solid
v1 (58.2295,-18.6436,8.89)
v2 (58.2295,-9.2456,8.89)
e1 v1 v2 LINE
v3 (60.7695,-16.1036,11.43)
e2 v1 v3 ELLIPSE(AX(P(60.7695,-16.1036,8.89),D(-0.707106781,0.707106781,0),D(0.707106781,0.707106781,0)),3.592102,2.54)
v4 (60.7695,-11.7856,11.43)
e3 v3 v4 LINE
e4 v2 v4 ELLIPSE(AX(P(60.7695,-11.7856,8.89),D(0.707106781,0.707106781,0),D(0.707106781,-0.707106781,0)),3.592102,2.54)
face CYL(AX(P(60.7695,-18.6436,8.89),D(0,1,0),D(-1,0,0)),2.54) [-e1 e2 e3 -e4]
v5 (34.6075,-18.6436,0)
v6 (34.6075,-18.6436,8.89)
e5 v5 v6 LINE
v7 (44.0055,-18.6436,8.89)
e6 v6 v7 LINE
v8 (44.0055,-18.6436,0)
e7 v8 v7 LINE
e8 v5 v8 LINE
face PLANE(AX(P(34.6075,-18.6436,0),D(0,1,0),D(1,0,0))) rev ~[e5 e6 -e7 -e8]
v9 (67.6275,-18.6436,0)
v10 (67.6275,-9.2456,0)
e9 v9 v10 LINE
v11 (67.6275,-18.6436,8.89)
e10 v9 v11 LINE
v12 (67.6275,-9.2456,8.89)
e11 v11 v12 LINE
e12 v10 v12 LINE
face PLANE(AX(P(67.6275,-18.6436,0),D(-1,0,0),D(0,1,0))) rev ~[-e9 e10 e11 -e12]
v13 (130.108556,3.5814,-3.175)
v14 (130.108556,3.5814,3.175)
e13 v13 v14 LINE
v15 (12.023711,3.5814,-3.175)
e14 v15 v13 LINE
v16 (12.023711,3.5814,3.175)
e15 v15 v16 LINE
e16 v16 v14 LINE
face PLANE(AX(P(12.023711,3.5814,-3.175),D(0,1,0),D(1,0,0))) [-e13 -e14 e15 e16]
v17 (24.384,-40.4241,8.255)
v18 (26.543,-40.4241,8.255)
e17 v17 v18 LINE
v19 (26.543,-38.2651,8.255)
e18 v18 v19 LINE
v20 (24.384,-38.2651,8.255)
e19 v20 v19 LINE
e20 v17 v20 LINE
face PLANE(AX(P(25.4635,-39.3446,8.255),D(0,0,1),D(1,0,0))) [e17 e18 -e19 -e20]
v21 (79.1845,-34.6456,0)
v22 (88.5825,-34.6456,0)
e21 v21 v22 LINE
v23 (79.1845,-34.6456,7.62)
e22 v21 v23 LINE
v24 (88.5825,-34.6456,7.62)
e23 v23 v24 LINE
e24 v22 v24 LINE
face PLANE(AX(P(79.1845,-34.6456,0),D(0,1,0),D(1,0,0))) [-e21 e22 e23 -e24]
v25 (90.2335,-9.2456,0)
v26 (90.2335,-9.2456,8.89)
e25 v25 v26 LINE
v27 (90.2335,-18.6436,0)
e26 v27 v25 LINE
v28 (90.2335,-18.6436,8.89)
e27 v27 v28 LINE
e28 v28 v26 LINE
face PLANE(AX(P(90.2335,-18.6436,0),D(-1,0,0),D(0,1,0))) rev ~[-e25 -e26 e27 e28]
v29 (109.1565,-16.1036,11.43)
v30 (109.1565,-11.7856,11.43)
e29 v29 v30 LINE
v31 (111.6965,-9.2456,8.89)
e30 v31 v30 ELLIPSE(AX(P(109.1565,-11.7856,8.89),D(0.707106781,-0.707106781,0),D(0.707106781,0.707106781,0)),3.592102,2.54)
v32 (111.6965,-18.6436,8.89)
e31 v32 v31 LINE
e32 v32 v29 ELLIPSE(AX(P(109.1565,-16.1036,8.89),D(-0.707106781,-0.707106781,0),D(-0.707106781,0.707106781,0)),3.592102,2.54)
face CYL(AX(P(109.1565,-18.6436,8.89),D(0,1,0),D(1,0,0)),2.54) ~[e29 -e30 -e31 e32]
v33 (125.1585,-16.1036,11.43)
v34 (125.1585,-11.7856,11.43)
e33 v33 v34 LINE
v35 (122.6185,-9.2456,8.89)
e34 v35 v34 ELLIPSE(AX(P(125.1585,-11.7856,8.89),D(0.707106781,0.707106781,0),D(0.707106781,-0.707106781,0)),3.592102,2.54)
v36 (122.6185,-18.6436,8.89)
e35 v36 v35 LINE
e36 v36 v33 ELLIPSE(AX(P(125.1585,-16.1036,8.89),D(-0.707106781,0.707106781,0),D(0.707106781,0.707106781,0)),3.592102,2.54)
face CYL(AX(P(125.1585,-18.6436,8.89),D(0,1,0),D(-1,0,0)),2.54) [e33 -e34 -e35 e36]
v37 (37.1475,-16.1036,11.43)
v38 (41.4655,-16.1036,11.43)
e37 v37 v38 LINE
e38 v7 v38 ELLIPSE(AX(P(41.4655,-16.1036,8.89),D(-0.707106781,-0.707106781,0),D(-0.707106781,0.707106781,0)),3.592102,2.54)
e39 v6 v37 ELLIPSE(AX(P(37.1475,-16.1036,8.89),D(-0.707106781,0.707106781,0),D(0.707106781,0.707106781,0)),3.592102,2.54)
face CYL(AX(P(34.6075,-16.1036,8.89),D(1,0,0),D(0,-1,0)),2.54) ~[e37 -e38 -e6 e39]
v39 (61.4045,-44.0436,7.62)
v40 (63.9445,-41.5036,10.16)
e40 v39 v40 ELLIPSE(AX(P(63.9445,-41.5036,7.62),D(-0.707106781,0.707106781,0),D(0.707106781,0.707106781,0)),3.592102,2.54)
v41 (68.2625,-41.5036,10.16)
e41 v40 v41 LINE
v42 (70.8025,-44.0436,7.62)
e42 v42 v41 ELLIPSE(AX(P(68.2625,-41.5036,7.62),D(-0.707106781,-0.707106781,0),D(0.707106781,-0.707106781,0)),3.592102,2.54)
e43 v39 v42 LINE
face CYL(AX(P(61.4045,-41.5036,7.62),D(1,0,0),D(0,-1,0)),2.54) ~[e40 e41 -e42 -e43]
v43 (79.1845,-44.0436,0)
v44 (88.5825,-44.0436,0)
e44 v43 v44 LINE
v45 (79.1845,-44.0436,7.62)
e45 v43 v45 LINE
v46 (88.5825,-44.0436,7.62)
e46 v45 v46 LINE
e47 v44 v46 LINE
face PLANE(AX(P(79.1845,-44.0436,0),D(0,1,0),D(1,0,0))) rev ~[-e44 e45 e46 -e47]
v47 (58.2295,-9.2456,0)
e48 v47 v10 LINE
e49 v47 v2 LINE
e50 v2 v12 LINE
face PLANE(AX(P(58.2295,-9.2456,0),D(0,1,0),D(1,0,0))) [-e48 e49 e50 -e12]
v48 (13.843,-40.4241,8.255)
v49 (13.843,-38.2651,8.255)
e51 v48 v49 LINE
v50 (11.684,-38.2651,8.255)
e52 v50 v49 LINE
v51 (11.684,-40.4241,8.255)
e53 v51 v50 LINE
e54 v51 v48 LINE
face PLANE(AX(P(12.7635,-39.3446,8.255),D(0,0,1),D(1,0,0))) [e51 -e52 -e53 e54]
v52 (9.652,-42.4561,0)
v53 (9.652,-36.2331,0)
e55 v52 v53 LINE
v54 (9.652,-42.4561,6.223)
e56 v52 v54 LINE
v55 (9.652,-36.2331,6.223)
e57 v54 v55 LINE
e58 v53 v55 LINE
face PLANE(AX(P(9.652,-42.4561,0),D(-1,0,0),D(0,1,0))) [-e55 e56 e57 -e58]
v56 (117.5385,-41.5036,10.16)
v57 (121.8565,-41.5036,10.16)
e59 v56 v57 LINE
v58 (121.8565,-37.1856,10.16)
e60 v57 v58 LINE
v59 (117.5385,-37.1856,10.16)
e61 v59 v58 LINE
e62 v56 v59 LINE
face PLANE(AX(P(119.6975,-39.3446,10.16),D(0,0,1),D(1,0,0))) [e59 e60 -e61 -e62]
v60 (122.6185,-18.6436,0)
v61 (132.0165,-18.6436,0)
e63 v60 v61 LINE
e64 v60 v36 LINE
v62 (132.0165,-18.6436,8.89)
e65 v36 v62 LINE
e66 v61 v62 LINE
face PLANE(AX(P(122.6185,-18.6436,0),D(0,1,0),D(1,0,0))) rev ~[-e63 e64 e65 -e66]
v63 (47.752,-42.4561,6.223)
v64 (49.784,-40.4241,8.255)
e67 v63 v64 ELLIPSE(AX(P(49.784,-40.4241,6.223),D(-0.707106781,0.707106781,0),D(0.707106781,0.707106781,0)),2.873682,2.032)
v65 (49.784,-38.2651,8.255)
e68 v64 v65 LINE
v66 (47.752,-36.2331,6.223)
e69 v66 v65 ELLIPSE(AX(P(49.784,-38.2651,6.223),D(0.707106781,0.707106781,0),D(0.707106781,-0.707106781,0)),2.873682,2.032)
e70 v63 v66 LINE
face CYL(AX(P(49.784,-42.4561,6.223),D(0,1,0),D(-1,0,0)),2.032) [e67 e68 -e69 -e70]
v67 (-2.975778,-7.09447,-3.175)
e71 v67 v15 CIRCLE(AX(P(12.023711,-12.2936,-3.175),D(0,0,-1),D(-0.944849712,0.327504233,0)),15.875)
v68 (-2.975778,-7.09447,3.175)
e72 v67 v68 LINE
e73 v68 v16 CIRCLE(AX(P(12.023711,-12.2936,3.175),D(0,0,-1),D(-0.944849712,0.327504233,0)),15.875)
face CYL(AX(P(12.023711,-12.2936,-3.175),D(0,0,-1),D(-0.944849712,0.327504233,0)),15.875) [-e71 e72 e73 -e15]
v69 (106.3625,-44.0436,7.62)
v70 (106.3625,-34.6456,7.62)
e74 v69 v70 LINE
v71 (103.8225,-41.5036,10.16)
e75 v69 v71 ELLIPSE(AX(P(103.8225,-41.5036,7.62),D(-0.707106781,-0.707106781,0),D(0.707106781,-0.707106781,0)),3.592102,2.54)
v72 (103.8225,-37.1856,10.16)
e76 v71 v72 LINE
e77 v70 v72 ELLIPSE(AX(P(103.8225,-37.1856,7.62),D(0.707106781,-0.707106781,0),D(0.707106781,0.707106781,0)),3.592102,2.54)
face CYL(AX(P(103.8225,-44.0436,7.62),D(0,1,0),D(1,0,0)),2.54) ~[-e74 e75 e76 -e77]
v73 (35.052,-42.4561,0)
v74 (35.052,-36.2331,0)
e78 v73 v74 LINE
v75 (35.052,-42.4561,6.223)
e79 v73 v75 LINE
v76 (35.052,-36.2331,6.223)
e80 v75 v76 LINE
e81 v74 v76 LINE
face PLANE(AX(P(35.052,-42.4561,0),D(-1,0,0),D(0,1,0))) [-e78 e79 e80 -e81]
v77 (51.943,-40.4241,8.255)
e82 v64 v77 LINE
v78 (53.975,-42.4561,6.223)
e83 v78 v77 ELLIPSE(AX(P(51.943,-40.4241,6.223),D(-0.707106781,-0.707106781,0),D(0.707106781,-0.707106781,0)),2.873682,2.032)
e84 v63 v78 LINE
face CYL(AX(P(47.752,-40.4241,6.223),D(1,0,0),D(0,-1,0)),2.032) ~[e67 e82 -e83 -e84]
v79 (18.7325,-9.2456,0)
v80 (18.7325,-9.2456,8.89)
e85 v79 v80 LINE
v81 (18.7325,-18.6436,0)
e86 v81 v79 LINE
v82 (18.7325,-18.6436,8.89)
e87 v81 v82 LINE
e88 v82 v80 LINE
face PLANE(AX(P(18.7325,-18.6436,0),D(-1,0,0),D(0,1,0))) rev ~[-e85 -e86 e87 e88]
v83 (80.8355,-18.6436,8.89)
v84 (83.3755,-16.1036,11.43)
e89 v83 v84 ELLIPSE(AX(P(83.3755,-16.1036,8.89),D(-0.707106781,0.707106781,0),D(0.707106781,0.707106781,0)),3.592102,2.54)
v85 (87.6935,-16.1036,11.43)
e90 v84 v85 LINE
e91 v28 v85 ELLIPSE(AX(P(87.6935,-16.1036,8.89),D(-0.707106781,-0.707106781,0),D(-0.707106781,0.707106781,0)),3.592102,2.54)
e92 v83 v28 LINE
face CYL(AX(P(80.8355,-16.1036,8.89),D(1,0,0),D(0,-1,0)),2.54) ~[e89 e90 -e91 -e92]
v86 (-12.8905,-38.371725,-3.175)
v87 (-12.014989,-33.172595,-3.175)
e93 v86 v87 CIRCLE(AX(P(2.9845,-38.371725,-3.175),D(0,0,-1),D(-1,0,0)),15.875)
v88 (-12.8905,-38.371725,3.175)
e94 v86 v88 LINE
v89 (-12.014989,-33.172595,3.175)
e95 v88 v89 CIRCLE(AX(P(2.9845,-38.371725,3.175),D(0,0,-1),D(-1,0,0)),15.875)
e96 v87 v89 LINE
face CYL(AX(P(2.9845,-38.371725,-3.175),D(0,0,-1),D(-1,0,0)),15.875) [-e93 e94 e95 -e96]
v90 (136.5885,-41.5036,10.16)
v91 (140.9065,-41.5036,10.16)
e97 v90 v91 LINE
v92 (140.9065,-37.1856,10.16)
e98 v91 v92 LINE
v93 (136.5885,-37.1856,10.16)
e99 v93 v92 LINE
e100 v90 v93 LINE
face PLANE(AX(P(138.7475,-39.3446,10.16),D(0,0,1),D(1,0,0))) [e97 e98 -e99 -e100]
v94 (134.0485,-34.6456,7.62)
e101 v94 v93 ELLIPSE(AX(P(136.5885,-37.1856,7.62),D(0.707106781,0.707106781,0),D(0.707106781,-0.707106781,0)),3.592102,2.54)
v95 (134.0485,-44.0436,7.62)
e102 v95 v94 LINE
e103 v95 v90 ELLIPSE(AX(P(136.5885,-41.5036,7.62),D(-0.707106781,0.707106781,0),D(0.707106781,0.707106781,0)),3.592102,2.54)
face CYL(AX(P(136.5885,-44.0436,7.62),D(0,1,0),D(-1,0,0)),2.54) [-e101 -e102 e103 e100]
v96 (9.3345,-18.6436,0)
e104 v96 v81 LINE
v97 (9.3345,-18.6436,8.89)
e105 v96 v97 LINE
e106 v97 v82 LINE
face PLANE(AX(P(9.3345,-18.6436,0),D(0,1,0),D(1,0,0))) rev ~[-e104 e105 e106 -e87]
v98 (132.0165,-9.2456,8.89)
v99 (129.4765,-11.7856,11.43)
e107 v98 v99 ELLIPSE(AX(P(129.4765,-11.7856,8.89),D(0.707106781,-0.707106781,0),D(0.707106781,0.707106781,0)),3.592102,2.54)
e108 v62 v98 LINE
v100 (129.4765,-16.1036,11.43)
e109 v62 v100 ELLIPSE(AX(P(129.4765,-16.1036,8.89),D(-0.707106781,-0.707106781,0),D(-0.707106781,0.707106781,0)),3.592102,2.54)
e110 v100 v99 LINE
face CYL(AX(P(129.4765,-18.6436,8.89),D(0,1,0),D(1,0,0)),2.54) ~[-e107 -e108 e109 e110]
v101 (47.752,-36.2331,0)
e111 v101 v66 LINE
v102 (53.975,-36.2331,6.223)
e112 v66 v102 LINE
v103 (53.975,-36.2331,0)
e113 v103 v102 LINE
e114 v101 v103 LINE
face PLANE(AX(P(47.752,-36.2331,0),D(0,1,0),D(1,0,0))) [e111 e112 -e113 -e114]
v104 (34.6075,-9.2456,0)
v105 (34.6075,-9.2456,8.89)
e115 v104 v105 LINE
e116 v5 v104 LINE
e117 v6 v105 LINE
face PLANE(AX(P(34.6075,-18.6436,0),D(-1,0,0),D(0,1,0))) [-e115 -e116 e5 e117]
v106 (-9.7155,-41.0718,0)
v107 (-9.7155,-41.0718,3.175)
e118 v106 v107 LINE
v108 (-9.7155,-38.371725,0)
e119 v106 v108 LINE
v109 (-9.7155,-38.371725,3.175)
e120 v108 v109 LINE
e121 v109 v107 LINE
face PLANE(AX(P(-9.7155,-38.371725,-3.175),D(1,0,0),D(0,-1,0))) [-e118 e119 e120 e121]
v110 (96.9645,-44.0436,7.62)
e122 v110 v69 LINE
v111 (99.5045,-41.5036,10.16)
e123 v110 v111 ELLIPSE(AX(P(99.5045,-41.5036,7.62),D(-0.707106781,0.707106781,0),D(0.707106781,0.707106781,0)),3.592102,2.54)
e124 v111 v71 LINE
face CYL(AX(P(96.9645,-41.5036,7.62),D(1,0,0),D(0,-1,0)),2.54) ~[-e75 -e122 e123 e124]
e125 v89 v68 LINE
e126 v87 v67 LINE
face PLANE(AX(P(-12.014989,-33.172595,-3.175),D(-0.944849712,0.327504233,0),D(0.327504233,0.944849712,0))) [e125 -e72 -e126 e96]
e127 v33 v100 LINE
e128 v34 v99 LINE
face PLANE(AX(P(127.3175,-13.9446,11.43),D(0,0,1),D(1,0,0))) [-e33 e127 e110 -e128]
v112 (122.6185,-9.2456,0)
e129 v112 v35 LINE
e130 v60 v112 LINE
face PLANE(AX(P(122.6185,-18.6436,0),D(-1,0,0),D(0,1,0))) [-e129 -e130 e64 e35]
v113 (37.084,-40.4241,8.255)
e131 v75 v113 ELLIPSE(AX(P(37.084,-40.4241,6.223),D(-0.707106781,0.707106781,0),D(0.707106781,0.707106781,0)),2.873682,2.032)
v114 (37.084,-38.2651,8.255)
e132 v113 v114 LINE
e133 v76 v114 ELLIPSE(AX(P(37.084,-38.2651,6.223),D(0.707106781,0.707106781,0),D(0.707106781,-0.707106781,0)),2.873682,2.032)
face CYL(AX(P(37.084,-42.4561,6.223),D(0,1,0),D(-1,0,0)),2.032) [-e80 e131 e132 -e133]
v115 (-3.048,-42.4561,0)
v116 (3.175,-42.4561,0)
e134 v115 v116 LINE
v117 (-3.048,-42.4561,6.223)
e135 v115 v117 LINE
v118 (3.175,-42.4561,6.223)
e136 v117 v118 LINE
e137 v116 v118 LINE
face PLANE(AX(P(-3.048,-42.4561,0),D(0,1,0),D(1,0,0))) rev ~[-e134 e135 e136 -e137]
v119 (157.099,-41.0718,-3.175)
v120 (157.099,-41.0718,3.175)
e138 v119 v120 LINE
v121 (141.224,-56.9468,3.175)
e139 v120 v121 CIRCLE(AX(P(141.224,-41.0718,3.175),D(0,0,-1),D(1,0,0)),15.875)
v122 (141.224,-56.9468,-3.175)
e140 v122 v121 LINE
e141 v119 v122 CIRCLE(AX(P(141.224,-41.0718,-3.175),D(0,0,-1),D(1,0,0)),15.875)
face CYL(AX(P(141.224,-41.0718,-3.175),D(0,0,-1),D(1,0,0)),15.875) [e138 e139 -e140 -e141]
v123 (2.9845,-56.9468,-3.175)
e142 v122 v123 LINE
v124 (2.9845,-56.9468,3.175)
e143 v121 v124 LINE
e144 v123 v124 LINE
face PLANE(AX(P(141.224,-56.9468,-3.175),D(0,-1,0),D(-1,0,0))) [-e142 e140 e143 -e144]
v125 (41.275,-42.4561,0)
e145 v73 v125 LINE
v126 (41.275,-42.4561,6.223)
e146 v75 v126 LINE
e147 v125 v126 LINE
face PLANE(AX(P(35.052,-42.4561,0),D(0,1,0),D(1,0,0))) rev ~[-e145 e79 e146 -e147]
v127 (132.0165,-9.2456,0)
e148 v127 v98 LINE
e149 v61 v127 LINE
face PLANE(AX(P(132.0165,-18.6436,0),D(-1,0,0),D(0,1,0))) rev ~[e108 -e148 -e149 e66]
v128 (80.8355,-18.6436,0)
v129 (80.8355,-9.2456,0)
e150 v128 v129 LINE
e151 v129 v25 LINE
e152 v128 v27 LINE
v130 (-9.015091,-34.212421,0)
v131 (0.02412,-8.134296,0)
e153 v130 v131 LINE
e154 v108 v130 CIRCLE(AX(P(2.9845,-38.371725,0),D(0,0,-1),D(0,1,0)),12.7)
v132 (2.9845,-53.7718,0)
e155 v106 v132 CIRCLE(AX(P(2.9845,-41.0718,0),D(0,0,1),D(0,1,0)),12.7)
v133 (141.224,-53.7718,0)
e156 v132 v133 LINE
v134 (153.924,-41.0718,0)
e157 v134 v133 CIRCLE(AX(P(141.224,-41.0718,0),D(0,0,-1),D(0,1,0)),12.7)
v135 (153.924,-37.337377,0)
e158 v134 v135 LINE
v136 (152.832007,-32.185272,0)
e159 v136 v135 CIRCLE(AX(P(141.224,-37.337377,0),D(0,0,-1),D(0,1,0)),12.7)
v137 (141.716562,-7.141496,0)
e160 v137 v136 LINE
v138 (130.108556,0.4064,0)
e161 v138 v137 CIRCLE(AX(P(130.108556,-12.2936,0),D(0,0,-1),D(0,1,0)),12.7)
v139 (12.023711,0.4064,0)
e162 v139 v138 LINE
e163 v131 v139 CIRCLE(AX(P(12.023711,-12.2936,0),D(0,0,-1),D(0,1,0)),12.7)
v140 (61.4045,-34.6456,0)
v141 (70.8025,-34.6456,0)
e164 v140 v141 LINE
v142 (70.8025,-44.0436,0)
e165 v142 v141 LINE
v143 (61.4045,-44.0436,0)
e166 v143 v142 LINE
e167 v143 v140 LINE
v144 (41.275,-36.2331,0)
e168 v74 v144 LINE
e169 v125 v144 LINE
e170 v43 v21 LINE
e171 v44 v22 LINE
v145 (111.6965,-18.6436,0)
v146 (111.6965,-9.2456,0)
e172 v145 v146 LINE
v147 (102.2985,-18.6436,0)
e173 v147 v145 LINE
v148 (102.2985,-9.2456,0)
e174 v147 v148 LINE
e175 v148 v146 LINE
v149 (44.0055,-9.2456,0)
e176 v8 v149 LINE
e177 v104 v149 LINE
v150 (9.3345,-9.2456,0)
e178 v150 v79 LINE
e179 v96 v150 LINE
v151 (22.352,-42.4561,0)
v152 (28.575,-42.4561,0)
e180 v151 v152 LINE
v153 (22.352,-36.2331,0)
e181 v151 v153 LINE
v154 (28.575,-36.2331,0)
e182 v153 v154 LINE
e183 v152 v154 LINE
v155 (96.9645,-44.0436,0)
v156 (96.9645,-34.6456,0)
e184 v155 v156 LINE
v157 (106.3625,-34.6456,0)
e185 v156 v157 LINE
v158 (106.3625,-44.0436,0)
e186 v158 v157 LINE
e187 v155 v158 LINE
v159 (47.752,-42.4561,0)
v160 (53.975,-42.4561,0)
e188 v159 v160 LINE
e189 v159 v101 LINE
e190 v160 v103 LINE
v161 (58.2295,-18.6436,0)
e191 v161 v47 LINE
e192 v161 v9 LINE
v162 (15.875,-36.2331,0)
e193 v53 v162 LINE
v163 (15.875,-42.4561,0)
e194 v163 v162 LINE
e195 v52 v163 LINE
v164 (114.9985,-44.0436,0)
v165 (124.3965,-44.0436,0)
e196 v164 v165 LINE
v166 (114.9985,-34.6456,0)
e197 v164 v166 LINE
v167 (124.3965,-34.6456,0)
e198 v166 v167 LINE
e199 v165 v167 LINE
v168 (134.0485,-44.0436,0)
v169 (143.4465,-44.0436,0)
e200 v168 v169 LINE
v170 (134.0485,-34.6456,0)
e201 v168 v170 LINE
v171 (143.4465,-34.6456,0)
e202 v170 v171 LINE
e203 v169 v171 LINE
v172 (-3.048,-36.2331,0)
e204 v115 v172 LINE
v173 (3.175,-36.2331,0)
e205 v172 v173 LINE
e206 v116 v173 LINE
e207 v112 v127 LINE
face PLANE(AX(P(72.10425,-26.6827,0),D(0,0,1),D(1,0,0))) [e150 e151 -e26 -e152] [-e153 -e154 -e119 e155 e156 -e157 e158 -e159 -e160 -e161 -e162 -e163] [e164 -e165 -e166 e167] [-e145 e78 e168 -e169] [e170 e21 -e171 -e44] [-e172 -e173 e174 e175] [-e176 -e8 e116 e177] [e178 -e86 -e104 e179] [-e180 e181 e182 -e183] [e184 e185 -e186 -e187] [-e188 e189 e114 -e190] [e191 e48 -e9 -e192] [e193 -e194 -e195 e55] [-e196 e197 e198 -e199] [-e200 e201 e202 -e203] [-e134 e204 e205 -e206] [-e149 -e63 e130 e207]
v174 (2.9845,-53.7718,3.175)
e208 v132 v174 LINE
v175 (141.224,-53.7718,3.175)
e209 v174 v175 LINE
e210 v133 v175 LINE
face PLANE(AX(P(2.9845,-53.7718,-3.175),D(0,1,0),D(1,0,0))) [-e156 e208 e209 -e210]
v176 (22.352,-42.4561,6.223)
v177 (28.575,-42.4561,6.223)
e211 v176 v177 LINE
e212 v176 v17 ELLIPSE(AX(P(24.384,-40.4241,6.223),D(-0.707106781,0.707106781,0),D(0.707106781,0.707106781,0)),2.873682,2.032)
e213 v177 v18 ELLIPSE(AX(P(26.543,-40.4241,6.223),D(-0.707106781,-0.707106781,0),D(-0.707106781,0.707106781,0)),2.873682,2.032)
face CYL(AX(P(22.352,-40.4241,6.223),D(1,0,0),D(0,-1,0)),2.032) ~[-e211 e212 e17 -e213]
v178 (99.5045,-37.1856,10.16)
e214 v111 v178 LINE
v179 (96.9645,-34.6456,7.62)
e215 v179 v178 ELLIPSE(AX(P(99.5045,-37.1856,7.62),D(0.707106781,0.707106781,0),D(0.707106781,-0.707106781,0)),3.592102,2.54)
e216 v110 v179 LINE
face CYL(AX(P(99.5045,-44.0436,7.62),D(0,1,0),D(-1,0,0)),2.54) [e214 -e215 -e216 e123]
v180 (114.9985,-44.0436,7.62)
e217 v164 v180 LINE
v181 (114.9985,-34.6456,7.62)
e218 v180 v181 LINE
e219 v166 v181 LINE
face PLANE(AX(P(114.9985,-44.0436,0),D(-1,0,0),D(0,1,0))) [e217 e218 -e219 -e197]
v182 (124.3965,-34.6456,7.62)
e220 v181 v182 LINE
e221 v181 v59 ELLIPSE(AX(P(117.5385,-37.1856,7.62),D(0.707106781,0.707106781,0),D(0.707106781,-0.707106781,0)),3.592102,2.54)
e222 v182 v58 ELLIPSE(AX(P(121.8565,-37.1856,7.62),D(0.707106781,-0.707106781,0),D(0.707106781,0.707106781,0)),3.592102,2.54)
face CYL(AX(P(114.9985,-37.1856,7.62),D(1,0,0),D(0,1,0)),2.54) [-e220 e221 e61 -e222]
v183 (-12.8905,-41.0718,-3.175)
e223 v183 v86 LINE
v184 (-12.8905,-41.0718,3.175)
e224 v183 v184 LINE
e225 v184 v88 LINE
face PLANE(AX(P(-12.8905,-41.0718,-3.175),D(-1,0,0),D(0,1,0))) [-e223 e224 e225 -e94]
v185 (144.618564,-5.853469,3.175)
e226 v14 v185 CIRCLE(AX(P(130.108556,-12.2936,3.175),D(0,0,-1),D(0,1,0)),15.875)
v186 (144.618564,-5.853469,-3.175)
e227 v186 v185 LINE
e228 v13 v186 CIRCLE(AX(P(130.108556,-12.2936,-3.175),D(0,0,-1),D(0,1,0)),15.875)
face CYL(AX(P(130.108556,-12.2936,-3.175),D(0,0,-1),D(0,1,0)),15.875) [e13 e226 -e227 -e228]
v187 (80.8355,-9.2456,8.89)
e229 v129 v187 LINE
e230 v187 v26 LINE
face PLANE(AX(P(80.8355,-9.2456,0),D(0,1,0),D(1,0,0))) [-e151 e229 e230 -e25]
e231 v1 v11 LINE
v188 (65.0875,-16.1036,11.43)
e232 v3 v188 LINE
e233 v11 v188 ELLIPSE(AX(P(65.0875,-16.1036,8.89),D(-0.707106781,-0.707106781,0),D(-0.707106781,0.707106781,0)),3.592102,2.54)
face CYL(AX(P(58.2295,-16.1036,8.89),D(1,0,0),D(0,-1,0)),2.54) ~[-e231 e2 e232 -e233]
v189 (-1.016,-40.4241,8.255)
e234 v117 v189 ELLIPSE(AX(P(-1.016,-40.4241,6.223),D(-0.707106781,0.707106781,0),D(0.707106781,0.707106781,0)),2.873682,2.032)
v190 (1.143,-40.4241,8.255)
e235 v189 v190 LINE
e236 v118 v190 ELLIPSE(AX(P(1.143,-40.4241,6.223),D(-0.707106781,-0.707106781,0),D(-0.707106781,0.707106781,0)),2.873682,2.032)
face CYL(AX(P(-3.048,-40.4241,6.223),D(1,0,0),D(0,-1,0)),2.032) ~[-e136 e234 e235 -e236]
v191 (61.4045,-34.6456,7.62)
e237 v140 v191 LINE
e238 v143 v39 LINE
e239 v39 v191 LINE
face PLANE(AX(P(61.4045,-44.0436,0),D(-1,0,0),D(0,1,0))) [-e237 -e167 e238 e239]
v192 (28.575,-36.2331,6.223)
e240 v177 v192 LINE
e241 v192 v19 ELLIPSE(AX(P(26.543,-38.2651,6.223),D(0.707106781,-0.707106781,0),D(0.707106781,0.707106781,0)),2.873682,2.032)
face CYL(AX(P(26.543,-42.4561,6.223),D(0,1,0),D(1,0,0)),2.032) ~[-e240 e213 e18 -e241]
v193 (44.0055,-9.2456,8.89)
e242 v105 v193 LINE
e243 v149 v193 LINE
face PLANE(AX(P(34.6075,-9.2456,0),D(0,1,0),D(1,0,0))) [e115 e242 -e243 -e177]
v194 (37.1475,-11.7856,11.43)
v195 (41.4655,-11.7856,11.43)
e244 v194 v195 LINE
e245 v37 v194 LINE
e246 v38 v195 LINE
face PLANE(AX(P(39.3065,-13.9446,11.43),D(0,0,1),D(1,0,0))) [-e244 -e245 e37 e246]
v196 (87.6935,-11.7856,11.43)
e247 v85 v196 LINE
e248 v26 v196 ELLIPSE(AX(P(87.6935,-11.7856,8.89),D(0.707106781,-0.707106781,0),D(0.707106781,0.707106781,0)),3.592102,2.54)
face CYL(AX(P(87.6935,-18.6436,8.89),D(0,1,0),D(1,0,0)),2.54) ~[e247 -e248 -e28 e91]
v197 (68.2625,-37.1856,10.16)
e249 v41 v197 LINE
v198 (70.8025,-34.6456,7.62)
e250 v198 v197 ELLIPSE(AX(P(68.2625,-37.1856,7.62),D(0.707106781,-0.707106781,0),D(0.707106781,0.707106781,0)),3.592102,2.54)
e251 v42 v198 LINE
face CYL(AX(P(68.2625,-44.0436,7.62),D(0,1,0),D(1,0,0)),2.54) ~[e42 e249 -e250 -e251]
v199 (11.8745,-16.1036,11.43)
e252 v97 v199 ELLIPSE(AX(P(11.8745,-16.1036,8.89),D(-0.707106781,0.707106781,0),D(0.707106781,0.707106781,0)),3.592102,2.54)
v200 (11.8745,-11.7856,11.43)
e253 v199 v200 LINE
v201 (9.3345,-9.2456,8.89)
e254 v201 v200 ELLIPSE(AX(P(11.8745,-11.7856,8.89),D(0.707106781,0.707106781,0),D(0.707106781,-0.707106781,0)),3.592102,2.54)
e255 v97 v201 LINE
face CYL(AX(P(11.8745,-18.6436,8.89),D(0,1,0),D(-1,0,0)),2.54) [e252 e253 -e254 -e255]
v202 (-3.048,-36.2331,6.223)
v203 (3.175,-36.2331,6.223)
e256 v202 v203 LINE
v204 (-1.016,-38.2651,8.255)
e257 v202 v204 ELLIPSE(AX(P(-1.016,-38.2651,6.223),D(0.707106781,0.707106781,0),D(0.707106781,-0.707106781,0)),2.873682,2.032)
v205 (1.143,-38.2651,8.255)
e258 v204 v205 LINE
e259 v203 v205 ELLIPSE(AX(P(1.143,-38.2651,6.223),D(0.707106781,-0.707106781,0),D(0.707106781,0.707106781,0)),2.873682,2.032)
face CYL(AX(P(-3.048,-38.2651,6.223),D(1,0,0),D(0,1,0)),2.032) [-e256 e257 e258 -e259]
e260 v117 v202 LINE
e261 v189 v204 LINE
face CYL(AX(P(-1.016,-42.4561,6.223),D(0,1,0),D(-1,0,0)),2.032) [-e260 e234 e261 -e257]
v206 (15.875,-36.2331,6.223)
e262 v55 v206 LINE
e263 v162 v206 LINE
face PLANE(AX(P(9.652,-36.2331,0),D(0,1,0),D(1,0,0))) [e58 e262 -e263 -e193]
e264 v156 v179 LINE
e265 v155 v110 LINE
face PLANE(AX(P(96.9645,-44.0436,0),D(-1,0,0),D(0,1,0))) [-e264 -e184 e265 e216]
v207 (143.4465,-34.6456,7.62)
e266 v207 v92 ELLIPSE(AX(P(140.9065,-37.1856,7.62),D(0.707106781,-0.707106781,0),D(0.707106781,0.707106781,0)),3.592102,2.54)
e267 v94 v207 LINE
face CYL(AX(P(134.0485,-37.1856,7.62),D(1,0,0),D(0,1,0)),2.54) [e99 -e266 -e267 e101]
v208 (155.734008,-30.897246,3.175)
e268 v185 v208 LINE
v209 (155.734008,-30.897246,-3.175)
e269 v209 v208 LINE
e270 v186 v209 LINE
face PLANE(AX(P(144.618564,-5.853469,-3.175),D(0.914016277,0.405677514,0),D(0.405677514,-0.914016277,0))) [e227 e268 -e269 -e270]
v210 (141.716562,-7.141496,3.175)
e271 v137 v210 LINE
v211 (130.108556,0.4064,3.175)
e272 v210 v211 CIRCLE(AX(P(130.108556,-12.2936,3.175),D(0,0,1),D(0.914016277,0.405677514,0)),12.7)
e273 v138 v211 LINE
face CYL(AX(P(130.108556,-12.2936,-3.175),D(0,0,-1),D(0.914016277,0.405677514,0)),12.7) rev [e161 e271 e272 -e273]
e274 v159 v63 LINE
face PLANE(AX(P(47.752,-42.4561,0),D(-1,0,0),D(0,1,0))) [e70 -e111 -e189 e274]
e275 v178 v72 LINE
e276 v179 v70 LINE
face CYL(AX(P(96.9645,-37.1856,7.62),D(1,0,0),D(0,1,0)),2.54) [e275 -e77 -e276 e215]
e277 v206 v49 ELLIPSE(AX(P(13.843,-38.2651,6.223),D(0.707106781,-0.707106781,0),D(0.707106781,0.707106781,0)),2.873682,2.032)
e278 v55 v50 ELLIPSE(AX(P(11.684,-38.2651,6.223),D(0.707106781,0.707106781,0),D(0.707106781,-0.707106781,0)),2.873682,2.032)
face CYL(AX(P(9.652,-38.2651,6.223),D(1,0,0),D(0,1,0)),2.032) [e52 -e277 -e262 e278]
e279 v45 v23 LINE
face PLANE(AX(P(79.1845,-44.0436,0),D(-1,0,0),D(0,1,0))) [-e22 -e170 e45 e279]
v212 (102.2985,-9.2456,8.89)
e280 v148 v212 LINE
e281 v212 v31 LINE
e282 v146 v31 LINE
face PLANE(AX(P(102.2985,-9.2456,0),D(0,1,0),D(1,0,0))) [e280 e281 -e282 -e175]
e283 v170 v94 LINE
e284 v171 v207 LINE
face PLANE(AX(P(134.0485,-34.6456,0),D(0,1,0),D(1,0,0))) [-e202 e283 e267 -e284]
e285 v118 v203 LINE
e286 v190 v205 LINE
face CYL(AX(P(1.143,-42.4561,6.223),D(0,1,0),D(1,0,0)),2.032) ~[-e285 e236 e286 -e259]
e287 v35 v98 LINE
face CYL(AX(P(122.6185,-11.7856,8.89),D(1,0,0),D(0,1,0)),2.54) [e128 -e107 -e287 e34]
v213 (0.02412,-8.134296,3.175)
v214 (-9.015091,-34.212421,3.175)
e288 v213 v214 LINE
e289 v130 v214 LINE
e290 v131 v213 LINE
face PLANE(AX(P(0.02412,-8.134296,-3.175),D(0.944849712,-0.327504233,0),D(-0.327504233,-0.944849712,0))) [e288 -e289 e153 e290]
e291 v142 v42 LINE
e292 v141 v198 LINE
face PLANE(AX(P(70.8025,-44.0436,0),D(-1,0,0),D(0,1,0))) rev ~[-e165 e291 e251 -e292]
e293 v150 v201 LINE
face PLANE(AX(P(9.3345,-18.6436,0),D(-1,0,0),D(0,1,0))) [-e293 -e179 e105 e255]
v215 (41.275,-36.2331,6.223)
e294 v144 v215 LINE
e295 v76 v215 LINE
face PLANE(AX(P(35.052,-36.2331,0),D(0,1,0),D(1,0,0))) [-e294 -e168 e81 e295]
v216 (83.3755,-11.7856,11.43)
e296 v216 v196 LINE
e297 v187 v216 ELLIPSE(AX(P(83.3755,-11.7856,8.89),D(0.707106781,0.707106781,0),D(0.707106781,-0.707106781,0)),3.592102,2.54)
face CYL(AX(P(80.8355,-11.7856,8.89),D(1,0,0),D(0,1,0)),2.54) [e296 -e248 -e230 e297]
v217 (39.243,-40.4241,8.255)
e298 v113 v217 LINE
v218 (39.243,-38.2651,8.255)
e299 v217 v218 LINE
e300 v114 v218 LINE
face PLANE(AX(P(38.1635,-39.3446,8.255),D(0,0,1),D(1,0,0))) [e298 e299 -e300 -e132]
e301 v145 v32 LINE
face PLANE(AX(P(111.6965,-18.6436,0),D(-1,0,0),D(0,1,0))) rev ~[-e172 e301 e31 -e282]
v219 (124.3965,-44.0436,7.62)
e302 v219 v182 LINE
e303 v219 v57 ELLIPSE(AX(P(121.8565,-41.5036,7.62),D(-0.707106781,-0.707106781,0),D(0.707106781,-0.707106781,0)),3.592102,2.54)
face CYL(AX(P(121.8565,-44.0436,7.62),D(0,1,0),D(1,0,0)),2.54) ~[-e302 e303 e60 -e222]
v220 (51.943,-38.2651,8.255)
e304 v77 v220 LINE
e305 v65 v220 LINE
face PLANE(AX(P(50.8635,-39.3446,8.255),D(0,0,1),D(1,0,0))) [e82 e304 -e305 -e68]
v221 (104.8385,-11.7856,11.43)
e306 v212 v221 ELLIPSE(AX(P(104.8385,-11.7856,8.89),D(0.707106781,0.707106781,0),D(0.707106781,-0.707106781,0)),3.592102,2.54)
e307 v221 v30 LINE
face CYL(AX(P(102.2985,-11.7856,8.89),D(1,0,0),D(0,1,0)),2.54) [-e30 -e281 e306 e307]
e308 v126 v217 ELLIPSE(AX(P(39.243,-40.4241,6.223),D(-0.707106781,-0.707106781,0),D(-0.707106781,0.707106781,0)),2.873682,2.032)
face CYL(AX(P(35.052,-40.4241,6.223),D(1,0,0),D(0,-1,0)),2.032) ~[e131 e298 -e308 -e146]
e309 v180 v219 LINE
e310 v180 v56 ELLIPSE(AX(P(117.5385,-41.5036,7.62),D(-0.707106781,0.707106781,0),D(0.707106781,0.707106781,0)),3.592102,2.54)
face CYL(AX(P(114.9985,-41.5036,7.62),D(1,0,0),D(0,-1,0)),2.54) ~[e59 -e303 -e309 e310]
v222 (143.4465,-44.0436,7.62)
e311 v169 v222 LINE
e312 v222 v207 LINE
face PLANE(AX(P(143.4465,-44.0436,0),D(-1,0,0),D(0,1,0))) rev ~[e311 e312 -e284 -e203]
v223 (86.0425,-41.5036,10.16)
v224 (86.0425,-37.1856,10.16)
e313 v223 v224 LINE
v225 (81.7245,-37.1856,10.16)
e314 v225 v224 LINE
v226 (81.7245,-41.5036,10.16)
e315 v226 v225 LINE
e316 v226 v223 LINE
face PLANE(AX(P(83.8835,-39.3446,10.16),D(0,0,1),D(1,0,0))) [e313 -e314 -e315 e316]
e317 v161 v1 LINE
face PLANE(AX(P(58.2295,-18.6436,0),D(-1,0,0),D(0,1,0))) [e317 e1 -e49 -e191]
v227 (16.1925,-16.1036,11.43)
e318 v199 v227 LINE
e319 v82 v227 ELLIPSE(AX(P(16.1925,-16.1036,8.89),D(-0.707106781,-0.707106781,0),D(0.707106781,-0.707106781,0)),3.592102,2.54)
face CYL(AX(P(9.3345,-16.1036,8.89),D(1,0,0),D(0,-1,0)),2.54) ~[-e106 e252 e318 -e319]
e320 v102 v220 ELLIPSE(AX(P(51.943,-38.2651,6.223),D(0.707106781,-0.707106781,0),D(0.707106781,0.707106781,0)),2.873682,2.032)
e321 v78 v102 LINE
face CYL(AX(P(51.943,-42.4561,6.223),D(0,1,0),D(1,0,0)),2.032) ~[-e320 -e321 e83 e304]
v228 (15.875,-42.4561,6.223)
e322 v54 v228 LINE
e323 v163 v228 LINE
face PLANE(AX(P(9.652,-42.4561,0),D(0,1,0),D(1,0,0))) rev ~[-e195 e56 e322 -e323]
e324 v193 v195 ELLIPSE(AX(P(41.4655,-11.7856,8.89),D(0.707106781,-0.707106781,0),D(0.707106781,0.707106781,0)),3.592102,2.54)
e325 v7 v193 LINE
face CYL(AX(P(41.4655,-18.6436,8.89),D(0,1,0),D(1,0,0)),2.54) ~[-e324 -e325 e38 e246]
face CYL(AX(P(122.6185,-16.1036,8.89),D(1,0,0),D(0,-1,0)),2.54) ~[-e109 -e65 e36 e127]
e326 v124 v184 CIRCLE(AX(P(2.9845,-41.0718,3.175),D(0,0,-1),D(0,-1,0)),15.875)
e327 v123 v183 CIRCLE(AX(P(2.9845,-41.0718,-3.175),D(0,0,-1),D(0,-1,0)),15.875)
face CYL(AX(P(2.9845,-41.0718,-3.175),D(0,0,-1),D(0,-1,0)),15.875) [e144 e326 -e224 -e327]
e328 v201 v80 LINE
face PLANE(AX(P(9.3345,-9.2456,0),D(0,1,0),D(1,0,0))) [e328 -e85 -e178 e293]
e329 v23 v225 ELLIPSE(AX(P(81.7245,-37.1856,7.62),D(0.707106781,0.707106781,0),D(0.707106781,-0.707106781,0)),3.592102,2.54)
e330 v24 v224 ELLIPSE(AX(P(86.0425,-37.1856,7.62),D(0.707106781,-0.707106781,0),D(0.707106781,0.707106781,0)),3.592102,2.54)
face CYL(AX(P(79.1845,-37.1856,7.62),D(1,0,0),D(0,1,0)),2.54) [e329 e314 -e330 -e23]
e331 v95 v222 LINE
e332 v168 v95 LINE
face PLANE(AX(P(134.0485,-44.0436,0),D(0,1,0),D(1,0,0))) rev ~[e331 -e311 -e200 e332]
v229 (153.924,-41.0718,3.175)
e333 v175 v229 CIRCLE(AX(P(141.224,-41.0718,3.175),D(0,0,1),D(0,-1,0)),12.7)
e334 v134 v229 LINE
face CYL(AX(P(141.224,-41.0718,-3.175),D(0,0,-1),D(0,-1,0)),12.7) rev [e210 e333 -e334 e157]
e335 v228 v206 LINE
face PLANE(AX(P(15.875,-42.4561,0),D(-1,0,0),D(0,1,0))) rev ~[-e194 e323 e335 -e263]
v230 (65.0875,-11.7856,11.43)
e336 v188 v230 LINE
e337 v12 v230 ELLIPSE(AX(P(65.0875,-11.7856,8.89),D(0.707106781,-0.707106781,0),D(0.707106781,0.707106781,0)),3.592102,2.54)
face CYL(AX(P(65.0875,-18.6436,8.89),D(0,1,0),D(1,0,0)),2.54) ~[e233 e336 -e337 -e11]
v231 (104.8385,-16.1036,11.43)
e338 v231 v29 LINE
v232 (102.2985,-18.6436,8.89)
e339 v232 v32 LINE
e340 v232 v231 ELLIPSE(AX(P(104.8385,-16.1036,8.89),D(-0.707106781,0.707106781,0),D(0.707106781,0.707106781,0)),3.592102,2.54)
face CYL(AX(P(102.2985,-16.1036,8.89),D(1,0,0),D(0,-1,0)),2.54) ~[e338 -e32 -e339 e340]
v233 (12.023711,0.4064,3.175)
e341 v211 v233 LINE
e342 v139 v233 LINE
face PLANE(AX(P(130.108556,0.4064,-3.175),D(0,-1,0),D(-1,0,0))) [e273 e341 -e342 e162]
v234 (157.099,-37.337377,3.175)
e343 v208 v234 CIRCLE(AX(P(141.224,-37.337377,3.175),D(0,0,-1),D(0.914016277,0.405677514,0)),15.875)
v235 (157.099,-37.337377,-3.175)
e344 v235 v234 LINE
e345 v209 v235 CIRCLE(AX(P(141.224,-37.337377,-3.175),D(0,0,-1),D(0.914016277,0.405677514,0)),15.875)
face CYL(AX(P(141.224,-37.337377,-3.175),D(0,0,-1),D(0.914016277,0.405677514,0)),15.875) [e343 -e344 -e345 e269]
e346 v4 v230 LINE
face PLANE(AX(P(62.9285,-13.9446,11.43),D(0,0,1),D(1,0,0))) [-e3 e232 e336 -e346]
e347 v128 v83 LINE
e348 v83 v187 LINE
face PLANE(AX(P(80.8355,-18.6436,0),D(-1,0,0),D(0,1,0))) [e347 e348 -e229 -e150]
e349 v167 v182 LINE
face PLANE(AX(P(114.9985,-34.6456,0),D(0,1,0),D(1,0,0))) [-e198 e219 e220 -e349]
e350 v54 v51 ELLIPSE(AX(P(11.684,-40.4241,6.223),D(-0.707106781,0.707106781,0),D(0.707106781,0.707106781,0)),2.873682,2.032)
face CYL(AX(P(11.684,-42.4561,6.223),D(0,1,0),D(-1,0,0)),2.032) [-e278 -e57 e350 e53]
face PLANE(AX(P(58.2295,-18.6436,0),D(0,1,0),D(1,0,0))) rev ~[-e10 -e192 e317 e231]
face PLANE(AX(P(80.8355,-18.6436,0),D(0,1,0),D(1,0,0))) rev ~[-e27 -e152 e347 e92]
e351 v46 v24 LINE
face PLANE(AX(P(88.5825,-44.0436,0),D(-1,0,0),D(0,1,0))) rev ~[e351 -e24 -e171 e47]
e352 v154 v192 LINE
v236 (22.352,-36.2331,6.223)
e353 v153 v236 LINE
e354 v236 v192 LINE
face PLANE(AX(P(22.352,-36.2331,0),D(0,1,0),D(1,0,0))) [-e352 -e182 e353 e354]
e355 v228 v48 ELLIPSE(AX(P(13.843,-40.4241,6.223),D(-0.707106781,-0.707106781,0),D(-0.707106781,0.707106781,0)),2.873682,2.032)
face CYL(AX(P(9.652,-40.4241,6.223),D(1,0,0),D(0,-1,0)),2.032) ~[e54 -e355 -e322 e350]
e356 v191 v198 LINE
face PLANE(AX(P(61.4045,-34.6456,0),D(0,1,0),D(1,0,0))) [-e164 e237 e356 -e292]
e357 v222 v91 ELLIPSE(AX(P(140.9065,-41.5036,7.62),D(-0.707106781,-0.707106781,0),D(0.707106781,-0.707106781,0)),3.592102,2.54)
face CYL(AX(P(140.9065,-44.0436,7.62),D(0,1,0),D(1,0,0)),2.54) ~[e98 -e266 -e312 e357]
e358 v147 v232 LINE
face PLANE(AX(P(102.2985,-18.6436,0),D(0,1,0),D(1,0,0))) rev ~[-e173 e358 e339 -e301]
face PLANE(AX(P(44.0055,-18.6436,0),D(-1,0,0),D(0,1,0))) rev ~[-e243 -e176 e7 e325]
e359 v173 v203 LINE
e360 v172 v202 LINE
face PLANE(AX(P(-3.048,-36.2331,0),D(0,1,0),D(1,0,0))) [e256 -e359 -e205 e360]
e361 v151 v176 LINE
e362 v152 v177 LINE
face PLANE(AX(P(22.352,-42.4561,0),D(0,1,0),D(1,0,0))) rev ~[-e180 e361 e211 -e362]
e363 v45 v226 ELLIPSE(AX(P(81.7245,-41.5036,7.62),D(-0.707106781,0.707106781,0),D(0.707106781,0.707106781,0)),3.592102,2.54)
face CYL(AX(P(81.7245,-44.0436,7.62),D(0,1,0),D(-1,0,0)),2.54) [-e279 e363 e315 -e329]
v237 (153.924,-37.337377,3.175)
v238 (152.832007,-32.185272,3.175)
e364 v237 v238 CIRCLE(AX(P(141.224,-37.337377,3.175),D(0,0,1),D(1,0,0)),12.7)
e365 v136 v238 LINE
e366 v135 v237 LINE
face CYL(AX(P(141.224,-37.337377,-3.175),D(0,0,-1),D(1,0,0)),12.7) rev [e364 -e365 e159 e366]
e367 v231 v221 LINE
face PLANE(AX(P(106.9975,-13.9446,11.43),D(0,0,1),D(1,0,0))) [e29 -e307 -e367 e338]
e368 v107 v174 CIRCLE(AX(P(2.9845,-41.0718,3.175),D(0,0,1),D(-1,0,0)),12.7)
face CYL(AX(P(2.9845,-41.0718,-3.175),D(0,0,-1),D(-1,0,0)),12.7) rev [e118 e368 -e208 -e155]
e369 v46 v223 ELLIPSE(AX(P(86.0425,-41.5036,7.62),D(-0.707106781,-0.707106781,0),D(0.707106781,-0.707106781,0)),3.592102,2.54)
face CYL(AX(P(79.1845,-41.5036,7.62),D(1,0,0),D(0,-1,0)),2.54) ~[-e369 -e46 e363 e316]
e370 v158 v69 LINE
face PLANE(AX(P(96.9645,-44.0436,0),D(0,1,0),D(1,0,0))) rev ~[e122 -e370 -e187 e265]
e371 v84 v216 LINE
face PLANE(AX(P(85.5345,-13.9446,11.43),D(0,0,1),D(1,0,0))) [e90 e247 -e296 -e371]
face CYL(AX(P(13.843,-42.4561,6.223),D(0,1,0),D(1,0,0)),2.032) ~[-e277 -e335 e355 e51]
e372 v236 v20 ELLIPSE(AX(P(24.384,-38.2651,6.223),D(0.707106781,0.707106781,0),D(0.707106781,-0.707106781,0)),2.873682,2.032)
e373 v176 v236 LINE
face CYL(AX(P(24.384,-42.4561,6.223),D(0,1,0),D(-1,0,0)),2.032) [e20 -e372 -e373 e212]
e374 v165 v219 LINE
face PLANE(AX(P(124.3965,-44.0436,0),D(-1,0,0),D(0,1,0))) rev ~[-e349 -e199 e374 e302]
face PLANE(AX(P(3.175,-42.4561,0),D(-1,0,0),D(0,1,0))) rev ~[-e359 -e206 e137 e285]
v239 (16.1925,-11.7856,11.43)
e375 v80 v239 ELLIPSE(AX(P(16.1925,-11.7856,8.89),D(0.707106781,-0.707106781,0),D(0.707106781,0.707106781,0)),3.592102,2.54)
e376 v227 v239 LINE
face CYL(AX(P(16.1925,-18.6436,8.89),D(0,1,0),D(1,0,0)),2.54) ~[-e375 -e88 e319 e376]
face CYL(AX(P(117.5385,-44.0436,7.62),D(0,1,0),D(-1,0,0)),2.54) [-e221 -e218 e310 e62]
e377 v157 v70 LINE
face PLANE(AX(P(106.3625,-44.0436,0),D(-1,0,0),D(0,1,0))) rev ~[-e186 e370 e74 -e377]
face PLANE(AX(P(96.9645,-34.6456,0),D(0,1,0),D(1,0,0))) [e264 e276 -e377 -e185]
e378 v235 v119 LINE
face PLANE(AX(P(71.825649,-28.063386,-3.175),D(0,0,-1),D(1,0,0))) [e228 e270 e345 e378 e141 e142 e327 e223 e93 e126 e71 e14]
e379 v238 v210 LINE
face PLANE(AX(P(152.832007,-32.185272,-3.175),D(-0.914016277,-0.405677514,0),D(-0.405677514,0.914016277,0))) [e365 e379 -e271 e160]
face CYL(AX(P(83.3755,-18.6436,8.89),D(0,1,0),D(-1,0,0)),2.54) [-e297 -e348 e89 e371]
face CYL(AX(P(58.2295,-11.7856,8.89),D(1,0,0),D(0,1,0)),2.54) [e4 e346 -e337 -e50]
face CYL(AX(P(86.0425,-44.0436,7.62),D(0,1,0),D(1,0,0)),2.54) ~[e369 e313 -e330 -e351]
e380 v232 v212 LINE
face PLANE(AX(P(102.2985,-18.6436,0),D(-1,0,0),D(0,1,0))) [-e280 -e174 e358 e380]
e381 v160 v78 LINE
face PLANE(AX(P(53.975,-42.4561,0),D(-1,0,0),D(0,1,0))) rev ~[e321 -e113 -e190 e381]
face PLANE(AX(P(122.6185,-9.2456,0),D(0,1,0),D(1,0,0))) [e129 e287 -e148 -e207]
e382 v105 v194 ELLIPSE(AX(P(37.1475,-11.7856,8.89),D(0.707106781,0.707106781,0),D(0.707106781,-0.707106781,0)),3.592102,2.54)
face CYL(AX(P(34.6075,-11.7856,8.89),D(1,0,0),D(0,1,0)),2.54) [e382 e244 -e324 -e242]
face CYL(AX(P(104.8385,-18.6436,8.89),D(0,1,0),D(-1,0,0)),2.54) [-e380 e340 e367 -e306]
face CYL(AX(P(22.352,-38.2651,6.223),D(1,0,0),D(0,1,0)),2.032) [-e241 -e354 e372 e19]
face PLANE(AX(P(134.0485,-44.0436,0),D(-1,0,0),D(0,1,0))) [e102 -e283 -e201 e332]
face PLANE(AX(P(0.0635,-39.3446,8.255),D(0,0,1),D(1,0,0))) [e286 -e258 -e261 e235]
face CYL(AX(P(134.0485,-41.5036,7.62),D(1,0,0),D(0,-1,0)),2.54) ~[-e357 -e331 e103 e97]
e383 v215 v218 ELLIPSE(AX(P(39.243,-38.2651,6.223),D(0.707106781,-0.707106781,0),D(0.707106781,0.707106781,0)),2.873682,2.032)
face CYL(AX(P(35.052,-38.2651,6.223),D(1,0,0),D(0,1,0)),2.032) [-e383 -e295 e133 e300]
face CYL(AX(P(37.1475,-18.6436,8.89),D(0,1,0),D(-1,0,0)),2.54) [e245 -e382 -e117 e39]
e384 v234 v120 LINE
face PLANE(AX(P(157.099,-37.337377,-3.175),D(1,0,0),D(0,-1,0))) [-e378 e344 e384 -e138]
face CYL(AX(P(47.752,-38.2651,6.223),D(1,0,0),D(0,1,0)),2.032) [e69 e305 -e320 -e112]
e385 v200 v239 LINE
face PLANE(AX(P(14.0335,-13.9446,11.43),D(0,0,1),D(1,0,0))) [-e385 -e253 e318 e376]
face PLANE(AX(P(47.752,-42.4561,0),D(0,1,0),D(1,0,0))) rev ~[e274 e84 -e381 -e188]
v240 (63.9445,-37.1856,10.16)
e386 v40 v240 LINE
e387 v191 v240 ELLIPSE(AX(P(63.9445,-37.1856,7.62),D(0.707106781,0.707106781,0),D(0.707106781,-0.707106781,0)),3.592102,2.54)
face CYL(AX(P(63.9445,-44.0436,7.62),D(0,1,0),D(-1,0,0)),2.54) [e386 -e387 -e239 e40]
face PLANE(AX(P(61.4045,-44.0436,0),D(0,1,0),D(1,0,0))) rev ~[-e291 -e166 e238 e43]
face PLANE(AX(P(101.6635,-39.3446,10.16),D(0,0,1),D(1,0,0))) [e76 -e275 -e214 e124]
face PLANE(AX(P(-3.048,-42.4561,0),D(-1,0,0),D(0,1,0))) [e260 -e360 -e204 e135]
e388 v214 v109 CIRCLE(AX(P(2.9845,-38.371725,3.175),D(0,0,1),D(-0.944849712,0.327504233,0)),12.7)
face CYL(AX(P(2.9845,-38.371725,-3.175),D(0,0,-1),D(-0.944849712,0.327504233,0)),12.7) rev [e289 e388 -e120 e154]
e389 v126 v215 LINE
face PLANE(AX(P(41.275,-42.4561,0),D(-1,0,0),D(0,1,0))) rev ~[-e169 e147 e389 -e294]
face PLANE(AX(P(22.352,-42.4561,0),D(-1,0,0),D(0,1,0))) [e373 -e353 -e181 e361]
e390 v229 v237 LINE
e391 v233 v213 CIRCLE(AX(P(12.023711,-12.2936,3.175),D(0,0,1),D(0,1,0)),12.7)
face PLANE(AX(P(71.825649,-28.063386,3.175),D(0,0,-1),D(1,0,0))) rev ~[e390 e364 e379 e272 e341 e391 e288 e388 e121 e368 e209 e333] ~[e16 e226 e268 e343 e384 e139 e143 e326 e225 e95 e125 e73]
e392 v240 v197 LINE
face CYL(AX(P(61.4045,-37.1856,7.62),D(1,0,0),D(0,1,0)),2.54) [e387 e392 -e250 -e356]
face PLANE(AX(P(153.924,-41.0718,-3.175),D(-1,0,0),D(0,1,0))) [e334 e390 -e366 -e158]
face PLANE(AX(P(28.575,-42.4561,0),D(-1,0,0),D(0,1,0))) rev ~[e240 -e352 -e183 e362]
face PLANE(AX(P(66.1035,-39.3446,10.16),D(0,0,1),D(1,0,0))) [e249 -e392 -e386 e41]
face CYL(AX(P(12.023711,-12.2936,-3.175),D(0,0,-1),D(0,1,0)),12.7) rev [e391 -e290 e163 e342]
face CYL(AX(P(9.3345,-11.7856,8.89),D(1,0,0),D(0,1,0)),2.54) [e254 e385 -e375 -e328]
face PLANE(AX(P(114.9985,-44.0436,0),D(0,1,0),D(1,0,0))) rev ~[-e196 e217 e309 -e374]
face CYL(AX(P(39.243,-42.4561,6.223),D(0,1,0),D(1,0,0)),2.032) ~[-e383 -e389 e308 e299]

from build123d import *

# Parameters (mm, degrees)
F0_W      = 163.6395
F0_H      = 54.1782
F1_DEPTH  = 3.175
F2_W      = 9.398
F2_H      = 9.398
F3_DEPTH  = 11.43
F4_W      = 9.398
F4_H      = 9.398
F5_DEPTH  = 10.16
F6_R      = 2.54
F7_R      = 2.54
F8_W      = 6.223
F8_H      = 6.223
F9_DEPTH  = 8.255
F10_R     = 2.032
F12_DEPTH = 25.4
F13_R     = 12.7
F15_DEPTH = 6.35


# Not quite as in the source:
# - a feature names something its author has since deleted; it is built from what else it names


with BuildPart() as f1:
    # F0 (on Top) → F1 (new body)
    with BuildSketch(Plane.XY):
        with Locations((72.10425, -26.6827)):
            Rectangle(F0_W, F0_H)
    extrude(amount=-F1_DEPTH)

    # F2 (on Top) → F3 (join)
    with BuildSketch(Plane.XY):
        with Locations((14.0335, -13.9446)):
            Rectangle(F2_W, F2_H)
        with Locations((39.3065, -13.9446)):
            Rectangle(F2_W, F2_H)
        with Locations((62.9285, -13.9446)):
            Rectangle(F2_W, F2_H)
        with Locations((85.5345, -13.9446)):
            Rectangle(F2_W, F2_H)
        with Locations((106.9975, -13.9446)):
            Rectangle(F2_W, F2_H)
        with Locations((127.3175, -13.9446)):
            Rectangle(F2_W, F2_H)
    extrude(amount=F3_DEPTH)

    # F4 (on face) → F5 (join)
    with BuildSketch(Plane.XY):
        with Locations((101.6635, -39.3446)):
            Rectangle(F4_W, F4_H)
        with Locations((138.7475, -39.3446)):
            Rectangle(F4_W, F4_H)
        with Locations((119.6975, -39.3446)):
            Rectangle(F4_W, F4_H)
        with Locations((83.8835, -39.3446)):
            Rectangle(F4_W, F4_H)
        with Locations((66.1035, -39.3446)):
            Rectangle(F4_W, F4_H)
    extrude(amount=F5_DEPTH)

    # F6
    f6_edges = [f1.edges().sort_by_distance(p)[0] for p in [
        (14.0335, -9.2456, 11.43),
        (9.3345, -13.9446, 11.43),
        (14.0335, -18.6436, 11.43),
        (18.7325, -13.9446, 11.43),
        (44.0055, -13.9446, 11.43),
        (39.3065, -9.2456, 11.43),
        (34.6075, -13.9446, 11.43),
        (39.3065, -18.6436, 11.43),
        (67.6275, -13.9446, 11.43),
        (62.9285, -9.2456, 11.43),
        (58.2295, -13.9446, 11.43),
        (62.9285, -18.6436, 11.43),
        (90.2335, -13.9446, 11.43),
        (85.5345, -9.2456, 11.43),
        (80.8355, -13.9446, 11.43),
        (85.5345, -18.6436, 11.43),
        (111.6965, -13.9446, 11.43),
        (106.9975, -9.2456, 11.43),
        (102.2985, -13.9446, 11.43),
        (106.9975, -18.6436, 11.43),
        (132.0165, -13.9446, 11.43),
        (127.3175, -9.2456, 11.43),
        (122.6185, -13.9446, 11.43),
        (127.3175, -18.6436, 11.43),
    ]]
    fillet(f6_edges, radius=F6_R)

    # F7
    f7_edges = [f1.edges().sort_by_distance(p)[0] for p in [
        (66.1035, -34.6456, 10.16),
        (61.4045, -39.3446, 10.16),
        (66.1035, -44.0436, 10.16),
        (70.8025, -39.3446, 10.16),
        (83.8835, -34.6456, 10.16),
        (79.1845, -39.3446, 10.16),
        (83.8835, -44.0436, 10.16),
        (88.5825, -39.3446, 10.16),
        (101.6635, -34.6456, 10.16),
        (96.9645, -39.3446, 10.16),
        (101.6635, -44.0436, 10.16),
        (106.3625, -39.3446, 10.16),
        (119.6975, -34.6456, 10.16),
        (114.9985, -39.3446, 10.16),
        (119.6975, -44.0436, 10.16),
        (124.3965, -39.3446, 10.16),
        (138.7475, -34.6456, 10.16),
        (134.0485, -39.3446, 10.16),
        (138.7475, -44.0436, 10.16),
        (143.4465, -39.3446, 10.16),
    ]]
    fillet(f7_edges, radius=F7_R)

    # F8 (on face) → F9 (join)
    with BuildSketch(Plane.XY):
        with Locations((50.8635, -39.3446)):
            Rectangle(F8_W, F8_H)
        with Locations((38.1635, -39.3446)):
            Rectangle(F8_W, F8_H)
        with Locations((25.4635, -39.3446)):
            Rectangle(F8_W, F8_H)
        with Locations((12.7635, -39.3446)):
            Rectangle(F8_W, F8_H)
        with Locations((0.0635, -39.3446)):
            Rectangle(F8_W, F8_H)
    extrude(amount=F9_DEPTH)

    # F10
    f10_edges = [f1.edges().sort_by_distance(p)[0] for p in [
        (50.8635, -36.2331, 8.255),
        (47.752, -39.3446, 8.255),
        (50.8635, -42.4561, 8.255),
        (53.975, -39.3446, 8.255),
        (41.275, -39.3446, 8.255),
        (38.1635, -36.2331, 8.255),
        (35.052, -39.3446, 8.255),
        (38.1635, -42.4561, 8.255),
        (28.575, -39.3446, 8.255),
        (25.4635, -36.2331, 8.255),
        (22.352, -39.3446, 8.255),
        (25.4635, -42.4561, 8.255),
        (15.875, -39.3446, 8.255),
        (12.7635, -36.2331, 8.255),
        (9.652, -39.3446, 8.255),
        (12.7635, -42.4561, 8.255),
        (3.175, -39.3446, 8.255),
        (0.0635, -36.2331, 8.255),
        (-3.048, -39.3446, 8.255),
        (0.0635, -42.4561, 8.255),
    ]]
    fillet(f10_edges, radius=F10_R)

    # F11 (on face) → F12 (cut)
    with BuildSketch(Plane.XY):
        Polygon((-9.7155, -36.2331), (2.9845, 0.4064), (-15.3606878594, 6.279731635), align=None)
        Polygon((160.9365438023, 5.6682056747), (138.3665, 0.4064), (153.924, -34.6456), align=None)
    extrude(amount=-F12_DEPTH, mode=Mode.SUBTRACT)

    # F13
    f13_edges = [f1.edges().sort_by_distance(p)[0] for p in [
        (2.9845, 0.4064, -1.5875),
        (-9.7155, -36.2331, -1.5875),
        (-9.7155, -53.7718, -1.5875),
        (153.924, -53.7718, -1.5875),
        (153.924, -34.6456, -1.5875),
        (138.3665, 0.4064, -1.5875),
    ]]
    fillet(f13_edges, radius=F13_R)

    # F14 (on face) → F15 (join)
    with BuildSketch(Plane(origin=(0, 0, -3.175), x_dir=(1, 0, 0), z_dir=(0, 0, -1))):
        with BuildLine():
            Line((141.224, 56.9468), (2.9845, 56.9468))
            ThreePointArc((2.9845, 56.9468), (-8.2408201513, 52.2971201513), (-12.8905, 41.0718))
            Line((-12.8905, 41.0718), (-12.8905, 38.3717247645))
            ThreePointArc((-12.8905, 38.3717247645), (-12.6700922272, 35.7355595192), (-12.0149891716, 33.172595069))
            Line((-12.0149891716, 33.172595069), (-2.9757778148, 7.0944703045))
            ThreePointArc((-2.9757778148, 7.0944703045), (2.8182933575, -0.6399186418), (12.0237113568, -3.5814))
            Line((12.0237113568, -3.5814), (130.1085556284, -3.5814))
            ThreePointArc((130.1085556284, -3.5814), (138.7624146724, -1.0152823214), (144.6185640244, 5.8534694619))
            Line((144.6185640244, 5.8534694619), (155.734008396, 30.8972461686))
            ThreePointArc((155.734008396, 30.8972461686), (156.754003353, 34.0457781807), (157.099, 37.3373767067))
            Line((157.099, 37.3373767067), (157.099, 41.0718))
            ThreePointArc((157.099, 41.0718), (152.4493201513, 52.2971201513), (141.224, 56.9468))
        make_face()
        with BuildLine():
            Line((152.8320067168, 32.1852722762), (141.7165623452, 7.1414955695))
            ThreePointArc((141.7165623452, 7.1414955695), (137.0316428636, 1.6464941428), (130.1085556284, -0.4064))
            Line((130.1085556284, -0.4064), (12.0237113568, -0.4064))
            ThreePointArc((12.0237113568, -0.4064), (4.6593769574, 1.9467850865), (0.0241200196, 8.1342962436))
            Line((0.0241200196, 8.1342962436), (-9.0150913373, 34.2124210081))
            ThreePointArc((-9.0150913373, 34.2124210081), (-9.5391737818, 36.2627925683), (-9.7155, 38.3717247645))
            Line((-9.7155, 38.3717247645), (-9.7155, 41.0718))
            ThreePointArc((-9.7155, 41.0718), (-5.9957561211, 50.0520561211), (2.9845, 53.7718))
            Line((2.9845, 53.7718), (141.224, 53.7718))
            ThreePointArc((141.224, 53.7718), (150.2042561211, 50.0520561211), (153.924, 41.0718))
            Line((153.924, 41.0718), (153.924, 37.3373767067))
            ThreePointArc((153.924, 37.3373767067), (153.6480026824, 34.7040978859), (152.8320067168, 32.1852722762))
        make_face(mode=Mode.SUBTRACT)
    extrude(amount=-F15_DEPTH)


solid = f1.part
